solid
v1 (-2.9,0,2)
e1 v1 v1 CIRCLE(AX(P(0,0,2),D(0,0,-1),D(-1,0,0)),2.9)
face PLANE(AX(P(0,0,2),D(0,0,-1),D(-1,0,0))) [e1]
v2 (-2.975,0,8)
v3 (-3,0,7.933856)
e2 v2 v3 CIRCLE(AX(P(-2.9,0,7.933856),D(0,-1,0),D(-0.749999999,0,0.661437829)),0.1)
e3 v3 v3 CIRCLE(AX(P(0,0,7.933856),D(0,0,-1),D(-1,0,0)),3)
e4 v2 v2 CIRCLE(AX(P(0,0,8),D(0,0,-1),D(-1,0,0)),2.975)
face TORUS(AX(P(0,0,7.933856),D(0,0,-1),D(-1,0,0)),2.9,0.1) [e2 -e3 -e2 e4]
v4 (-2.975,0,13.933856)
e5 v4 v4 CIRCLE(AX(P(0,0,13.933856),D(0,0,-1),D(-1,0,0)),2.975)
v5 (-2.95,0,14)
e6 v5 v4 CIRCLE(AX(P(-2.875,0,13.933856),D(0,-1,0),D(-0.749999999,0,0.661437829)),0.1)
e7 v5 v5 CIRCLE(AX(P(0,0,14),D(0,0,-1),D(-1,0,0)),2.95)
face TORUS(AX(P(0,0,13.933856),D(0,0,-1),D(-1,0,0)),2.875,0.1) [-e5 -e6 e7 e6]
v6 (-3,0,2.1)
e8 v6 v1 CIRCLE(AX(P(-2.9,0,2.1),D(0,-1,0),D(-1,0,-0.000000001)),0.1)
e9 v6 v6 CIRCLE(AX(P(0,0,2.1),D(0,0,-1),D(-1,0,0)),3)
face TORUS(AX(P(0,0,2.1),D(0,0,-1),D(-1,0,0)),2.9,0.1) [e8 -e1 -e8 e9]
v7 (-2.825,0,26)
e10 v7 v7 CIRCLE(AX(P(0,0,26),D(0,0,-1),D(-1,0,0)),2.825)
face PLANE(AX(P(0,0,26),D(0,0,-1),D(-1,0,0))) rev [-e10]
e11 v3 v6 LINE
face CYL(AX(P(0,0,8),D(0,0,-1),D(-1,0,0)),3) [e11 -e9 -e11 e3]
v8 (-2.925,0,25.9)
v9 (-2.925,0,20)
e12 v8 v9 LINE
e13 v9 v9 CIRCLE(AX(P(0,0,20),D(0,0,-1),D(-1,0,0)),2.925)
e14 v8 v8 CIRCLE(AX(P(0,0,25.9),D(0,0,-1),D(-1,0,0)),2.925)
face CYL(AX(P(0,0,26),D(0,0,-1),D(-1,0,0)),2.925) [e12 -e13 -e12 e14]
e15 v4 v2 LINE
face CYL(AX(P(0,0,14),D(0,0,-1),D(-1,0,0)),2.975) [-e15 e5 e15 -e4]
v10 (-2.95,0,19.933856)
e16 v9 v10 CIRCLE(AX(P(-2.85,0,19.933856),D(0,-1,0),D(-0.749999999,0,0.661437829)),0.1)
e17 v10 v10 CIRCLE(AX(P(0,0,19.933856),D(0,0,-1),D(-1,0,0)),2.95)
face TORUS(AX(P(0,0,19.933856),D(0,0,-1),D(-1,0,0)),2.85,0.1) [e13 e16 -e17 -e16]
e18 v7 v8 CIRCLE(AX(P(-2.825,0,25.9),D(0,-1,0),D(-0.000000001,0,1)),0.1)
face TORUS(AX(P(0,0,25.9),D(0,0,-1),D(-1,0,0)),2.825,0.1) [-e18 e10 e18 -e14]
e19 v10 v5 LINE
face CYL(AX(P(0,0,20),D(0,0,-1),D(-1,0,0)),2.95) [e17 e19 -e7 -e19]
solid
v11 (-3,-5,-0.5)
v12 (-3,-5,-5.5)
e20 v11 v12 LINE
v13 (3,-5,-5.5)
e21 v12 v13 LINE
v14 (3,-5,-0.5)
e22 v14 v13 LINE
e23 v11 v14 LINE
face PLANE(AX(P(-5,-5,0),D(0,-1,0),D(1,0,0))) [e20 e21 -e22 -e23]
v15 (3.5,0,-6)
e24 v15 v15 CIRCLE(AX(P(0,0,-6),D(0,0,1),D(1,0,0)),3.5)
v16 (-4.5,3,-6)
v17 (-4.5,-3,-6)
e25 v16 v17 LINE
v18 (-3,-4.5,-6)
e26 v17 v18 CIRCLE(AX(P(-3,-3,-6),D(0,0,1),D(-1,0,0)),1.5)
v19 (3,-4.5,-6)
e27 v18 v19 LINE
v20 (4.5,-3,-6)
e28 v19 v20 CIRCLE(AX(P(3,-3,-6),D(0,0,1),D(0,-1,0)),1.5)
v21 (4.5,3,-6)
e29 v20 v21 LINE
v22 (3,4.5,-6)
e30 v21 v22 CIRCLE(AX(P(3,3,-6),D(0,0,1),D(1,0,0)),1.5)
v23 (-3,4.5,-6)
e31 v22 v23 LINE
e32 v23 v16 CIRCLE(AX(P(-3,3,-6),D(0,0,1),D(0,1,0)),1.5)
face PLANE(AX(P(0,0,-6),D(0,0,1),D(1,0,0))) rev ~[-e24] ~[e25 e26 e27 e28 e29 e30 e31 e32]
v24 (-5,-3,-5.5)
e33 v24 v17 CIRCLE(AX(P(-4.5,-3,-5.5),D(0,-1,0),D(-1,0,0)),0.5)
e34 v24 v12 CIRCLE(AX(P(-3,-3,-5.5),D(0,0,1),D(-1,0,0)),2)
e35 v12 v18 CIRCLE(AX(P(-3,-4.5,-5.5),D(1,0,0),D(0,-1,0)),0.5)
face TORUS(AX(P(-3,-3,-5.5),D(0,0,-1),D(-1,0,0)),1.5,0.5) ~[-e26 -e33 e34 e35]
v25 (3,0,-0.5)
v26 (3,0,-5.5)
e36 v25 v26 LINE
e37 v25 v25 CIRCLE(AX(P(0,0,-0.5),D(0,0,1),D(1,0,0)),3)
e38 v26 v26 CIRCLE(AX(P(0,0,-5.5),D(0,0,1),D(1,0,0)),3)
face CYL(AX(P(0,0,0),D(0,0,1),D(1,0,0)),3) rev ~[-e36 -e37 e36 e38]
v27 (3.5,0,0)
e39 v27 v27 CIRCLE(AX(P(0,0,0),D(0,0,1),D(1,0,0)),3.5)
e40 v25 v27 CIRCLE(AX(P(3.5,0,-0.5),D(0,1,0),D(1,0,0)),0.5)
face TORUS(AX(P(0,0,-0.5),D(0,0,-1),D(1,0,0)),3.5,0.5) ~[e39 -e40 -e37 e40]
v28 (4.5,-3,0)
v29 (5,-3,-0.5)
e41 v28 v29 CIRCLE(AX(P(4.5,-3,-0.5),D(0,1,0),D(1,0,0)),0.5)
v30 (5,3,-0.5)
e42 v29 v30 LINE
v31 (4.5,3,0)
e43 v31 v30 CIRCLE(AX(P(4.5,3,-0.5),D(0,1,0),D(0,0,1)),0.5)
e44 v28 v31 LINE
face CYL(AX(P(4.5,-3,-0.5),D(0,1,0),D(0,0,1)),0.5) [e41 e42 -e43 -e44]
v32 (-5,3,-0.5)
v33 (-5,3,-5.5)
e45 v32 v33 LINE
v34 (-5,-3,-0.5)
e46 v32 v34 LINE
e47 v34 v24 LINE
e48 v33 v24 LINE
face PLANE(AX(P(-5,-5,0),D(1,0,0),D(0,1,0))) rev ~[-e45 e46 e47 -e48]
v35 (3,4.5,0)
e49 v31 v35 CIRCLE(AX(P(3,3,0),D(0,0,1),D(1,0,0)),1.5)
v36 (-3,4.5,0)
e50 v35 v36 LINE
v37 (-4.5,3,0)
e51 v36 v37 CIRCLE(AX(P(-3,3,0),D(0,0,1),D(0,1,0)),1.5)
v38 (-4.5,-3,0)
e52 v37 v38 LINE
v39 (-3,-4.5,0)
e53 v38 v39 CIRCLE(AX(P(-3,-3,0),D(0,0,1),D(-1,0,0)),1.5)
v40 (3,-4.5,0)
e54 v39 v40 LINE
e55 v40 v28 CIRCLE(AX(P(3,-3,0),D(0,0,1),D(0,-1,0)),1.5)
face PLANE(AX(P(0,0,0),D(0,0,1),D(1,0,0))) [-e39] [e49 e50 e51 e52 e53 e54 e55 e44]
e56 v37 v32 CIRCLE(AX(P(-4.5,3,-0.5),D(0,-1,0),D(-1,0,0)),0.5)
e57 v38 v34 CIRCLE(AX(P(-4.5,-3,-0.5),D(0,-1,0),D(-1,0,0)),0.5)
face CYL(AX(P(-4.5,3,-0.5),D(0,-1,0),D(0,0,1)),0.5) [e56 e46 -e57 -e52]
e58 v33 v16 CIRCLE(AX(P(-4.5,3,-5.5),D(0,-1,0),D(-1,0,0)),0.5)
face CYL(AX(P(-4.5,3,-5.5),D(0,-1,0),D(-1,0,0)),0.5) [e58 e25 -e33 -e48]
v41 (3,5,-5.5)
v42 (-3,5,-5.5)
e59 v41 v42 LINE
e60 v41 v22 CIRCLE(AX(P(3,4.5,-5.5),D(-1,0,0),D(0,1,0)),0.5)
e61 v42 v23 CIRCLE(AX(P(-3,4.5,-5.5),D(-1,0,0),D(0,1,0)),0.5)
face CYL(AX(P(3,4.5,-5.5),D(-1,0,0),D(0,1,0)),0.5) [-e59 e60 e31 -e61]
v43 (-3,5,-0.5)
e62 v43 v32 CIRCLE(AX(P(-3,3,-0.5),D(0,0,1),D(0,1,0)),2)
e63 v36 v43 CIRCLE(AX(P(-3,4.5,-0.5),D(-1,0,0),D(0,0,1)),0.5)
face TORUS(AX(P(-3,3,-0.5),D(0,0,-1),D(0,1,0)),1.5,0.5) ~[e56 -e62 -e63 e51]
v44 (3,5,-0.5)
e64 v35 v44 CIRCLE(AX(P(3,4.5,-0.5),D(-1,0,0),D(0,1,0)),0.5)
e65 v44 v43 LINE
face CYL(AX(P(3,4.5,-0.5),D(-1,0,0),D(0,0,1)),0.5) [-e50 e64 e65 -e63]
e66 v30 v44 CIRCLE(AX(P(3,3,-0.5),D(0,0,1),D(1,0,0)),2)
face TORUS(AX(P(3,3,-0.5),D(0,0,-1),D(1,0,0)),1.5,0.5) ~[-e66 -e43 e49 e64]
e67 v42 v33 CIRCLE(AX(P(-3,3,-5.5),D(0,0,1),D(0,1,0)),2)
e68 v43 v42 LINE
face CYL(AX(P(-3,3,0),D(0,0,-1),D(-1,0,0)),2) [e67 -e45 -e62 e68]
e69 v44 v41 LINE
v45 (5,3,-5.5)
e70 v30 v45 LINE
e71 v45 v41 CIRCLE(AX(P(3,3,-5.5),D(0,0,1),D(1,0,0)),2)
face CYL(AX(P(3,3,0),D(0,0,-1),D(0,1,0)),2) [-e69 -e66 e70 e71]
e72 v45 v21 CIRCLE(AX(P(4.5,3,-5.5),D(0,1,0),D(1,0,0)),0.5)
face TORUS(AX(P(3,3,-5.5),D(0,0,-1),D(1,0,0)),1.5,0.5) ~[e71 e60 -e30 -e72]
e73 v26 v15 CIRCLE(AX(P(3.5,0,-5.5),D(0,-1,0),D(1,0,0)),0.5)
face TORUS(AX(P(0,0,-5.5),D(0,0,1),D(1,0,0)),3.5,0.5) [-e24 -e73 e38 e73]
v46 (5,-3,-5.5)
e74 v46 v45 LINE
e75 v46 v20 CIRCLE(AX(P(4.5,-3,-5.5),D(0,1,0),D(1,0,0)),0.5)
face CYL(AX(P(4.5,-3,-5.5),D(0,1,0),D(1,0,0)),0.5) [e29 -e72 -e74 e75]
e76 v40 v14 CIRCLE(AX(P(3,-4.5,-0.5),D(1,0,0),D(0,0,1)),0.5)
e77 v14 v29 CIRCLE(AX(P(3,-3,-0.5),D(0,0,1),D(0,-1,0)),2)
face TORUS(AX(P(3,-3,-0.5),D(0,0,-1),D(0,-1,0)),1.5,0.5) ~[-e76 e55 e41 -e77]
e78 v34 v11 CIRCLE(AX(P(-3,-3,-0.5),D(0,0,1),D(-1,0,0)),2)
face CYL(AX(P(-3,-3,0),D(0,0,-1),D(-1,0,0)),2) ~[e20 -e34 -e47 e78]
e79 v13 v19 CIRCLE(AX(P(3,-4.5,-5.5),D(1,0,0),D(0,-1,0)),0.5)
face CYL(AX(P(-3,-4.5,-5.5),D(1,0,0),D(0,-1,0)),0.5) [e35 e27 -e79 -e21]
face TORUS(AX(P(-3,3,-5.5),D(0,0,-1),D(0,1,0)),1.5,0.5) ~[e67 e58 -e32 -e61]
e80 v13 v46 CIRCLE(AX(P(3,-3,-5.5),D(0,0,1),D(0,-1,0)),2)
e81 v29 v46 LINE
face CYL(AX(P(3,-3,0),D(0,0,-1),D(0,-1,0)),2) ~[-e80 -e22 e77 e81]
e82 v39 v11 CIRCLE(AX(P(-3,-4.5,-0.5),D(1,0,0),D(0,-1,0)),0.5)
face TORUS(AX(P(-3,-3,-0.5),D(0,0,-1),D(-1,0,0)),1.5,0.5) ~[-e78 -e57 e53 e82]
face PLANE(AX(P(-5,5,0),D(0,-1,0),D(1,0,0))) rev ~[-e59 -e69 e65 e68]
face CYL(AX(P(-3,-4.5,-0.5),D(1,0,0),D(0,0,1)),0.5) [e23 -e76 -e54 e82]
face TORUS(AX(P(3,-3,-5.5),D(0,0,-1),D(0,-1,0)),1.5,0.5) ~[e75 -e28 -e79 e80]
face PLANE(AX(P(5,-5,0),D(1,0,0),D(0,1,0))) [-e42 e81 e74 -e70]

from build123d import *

# Parameters (mm, degrees)
F0_W     = 10
F0_H     = 10
F0_R     = 3
F1_DEPTH = 6
F2_R     = 0.5
F3_R     = 2
F4_R     = 0.5


# Not quite as in the source:
# - a fillet or chamfer that OpenCascade refuses, or shapes differently, is made with other operations: its cross-section is extruded or revolved along the edge and cut away or added


with BuildPart() as f1:
    # F0 (on Top) → F1 (new body)
    with BuildSketch(Plane.XY):
        Rectangle(F0_W, F0_H)
        Circle(F0_R, mode=Mode.SUBTRACT)
    extrude(amount=-F1_DEPTH)

    # F2
    f2_edges = [f1.edges().sort_by_distance(p)[0] for p in [
        (-3, 0, -6),
        (-3, 0, 0),
    ]]
    fillet(f2_edges, radius=F2_R)

    # F3
    f3_edges = [f1.edges().sort_by_distance(p)[0] for p in [
        (-5, -5, -3),
        (5, -5, -3),
        (-5, 5, -3),
        (5, 5, -3),
    ]]
    fillet(f3_edges, radius=F3_R)

    # F4
    f4_edges = [f1.edges().sort_by_distance(p)[0] for p in [
        (-4.414214, -4.414214, -6),
        (-4.414214, -4.414214, 0),
        (5, 0, 0),
        (4.414214, -4.414214, 0),
        (4.414214, 4.414214, 0),
        (0, -5, 0),
        (0, 5, 0),
        (-4.414214, 4.414214, 0),
        (-5, 0, 0),
        (5, 0, -6),
        (4.414214, -4.414214, -6),
        (4.414214, 4.414214, -6),
        (0, -5, -6),
        (0, 5, -6),
        (-4.414214, 4.414214, -6),
        (-5, 0, -6),
    ]]
    fillet(f4_edges, radius=F4_R)


with BuildPart() as f6:
    # F5 (on Front) → F6 (revolve)
    with BuildSketch(Plane.XZ):
        Polygon((0, 2), (0, 26), (-2.925, 26), (-2.925, 20), (-2.95, 20), (-2.95, 14), (-2.975, 14), (-2.975, 8), (-3, 8), (-3, 2), align=None)
    revolve(axis=Axis((0, 0, 14), (0, 0, -1)))

    # F7: fillet of radius 0.1 on 5 edges, made by hand

    # F7_s1 → F7_t2 (revolve, cut)
    with BuildSketch(Plane.XZ):
        with BuildLine():
            ThreePointArc((-2.925, 20), (-2.9435414347, 19.9692115563), (-2.95, 19.9338562172))
            Line((-2.95, 19.9338562172), (-2.95, 20))
            Line((-2.95, 20), (-2.925, 20))
        make_face()
    revolve(axis=Axis((0, 0, 20), (0, 0, -1)), mode=Mode.SUBTRACT)

    # F7_s3 → F7_t4 (revolve, cut)
    with BuildSketch(Plane.XZ):
        with BuildLine():
            ThreePointArc((-2.95, 14), (-2.9685414347, 13.9692115563), (-2.975, 13.9338562172))
            Line((-2.975, 13.9338562172), (-2.975, 14))
            Line((-2.975, 14), (-2.95, 14))
        make_face()
    revolve(axis=Axis((0, 0, 14), (0, 0, -1)), mode=Mode.SUBTRACT)

    # F7_s5 → F7_t6 (revolve, cut)
    with BuildSketch(Plane.XZ):
        with BuildLine():
            ThreePointArc((-2.975, 8), (-2.9935414347, 7.9692115563), (-3, 7.9338562172))
            Line((-3, 7.9338562172), (-3, 8))
            Line((-3, 8), (-2.975, 8))
        make_face()
    revolve(axis=Axis((0, 0, 8), (0, 0, -1)), mode=Mode.SUBTRACT)

    # F7_s7 → F7_t8 (revolve, cut)
    with BuildSketch(Plane.XZ):
        with BuildLine():
            ThreePointArc((-2.825, 26), (-2.8957106781, 25.9707106781), (-2.925, 25.9))
            Line((-2.925, 25.9), (-2.925, 26))
            Line((-2.925, 26), (-2.825, 26))
        make_face()
    revolve(axis=Axis((0, 0, 26), (0, 0, -1)), mode=Mode.SUBTRACT)

    # F7_s9 → F7_t10 (revolve, cut)
    with BuildSketch(Plane.XZ):
        with BuildLine():
            ThreePointArc((-3, 2.1), (-2.9707106781, 2.0292893219), (-2.9, 2))
            Line((-2.9, 2), (-3, 2))
            Line((-3, 2), (-3, 2.1))
        make_face()
    revolve(axis=Axis((0, 0, 2), (0, 0, -1)), mode=Mode.SUBTRACT)


solid = Compound([f1.part, f6.part])
